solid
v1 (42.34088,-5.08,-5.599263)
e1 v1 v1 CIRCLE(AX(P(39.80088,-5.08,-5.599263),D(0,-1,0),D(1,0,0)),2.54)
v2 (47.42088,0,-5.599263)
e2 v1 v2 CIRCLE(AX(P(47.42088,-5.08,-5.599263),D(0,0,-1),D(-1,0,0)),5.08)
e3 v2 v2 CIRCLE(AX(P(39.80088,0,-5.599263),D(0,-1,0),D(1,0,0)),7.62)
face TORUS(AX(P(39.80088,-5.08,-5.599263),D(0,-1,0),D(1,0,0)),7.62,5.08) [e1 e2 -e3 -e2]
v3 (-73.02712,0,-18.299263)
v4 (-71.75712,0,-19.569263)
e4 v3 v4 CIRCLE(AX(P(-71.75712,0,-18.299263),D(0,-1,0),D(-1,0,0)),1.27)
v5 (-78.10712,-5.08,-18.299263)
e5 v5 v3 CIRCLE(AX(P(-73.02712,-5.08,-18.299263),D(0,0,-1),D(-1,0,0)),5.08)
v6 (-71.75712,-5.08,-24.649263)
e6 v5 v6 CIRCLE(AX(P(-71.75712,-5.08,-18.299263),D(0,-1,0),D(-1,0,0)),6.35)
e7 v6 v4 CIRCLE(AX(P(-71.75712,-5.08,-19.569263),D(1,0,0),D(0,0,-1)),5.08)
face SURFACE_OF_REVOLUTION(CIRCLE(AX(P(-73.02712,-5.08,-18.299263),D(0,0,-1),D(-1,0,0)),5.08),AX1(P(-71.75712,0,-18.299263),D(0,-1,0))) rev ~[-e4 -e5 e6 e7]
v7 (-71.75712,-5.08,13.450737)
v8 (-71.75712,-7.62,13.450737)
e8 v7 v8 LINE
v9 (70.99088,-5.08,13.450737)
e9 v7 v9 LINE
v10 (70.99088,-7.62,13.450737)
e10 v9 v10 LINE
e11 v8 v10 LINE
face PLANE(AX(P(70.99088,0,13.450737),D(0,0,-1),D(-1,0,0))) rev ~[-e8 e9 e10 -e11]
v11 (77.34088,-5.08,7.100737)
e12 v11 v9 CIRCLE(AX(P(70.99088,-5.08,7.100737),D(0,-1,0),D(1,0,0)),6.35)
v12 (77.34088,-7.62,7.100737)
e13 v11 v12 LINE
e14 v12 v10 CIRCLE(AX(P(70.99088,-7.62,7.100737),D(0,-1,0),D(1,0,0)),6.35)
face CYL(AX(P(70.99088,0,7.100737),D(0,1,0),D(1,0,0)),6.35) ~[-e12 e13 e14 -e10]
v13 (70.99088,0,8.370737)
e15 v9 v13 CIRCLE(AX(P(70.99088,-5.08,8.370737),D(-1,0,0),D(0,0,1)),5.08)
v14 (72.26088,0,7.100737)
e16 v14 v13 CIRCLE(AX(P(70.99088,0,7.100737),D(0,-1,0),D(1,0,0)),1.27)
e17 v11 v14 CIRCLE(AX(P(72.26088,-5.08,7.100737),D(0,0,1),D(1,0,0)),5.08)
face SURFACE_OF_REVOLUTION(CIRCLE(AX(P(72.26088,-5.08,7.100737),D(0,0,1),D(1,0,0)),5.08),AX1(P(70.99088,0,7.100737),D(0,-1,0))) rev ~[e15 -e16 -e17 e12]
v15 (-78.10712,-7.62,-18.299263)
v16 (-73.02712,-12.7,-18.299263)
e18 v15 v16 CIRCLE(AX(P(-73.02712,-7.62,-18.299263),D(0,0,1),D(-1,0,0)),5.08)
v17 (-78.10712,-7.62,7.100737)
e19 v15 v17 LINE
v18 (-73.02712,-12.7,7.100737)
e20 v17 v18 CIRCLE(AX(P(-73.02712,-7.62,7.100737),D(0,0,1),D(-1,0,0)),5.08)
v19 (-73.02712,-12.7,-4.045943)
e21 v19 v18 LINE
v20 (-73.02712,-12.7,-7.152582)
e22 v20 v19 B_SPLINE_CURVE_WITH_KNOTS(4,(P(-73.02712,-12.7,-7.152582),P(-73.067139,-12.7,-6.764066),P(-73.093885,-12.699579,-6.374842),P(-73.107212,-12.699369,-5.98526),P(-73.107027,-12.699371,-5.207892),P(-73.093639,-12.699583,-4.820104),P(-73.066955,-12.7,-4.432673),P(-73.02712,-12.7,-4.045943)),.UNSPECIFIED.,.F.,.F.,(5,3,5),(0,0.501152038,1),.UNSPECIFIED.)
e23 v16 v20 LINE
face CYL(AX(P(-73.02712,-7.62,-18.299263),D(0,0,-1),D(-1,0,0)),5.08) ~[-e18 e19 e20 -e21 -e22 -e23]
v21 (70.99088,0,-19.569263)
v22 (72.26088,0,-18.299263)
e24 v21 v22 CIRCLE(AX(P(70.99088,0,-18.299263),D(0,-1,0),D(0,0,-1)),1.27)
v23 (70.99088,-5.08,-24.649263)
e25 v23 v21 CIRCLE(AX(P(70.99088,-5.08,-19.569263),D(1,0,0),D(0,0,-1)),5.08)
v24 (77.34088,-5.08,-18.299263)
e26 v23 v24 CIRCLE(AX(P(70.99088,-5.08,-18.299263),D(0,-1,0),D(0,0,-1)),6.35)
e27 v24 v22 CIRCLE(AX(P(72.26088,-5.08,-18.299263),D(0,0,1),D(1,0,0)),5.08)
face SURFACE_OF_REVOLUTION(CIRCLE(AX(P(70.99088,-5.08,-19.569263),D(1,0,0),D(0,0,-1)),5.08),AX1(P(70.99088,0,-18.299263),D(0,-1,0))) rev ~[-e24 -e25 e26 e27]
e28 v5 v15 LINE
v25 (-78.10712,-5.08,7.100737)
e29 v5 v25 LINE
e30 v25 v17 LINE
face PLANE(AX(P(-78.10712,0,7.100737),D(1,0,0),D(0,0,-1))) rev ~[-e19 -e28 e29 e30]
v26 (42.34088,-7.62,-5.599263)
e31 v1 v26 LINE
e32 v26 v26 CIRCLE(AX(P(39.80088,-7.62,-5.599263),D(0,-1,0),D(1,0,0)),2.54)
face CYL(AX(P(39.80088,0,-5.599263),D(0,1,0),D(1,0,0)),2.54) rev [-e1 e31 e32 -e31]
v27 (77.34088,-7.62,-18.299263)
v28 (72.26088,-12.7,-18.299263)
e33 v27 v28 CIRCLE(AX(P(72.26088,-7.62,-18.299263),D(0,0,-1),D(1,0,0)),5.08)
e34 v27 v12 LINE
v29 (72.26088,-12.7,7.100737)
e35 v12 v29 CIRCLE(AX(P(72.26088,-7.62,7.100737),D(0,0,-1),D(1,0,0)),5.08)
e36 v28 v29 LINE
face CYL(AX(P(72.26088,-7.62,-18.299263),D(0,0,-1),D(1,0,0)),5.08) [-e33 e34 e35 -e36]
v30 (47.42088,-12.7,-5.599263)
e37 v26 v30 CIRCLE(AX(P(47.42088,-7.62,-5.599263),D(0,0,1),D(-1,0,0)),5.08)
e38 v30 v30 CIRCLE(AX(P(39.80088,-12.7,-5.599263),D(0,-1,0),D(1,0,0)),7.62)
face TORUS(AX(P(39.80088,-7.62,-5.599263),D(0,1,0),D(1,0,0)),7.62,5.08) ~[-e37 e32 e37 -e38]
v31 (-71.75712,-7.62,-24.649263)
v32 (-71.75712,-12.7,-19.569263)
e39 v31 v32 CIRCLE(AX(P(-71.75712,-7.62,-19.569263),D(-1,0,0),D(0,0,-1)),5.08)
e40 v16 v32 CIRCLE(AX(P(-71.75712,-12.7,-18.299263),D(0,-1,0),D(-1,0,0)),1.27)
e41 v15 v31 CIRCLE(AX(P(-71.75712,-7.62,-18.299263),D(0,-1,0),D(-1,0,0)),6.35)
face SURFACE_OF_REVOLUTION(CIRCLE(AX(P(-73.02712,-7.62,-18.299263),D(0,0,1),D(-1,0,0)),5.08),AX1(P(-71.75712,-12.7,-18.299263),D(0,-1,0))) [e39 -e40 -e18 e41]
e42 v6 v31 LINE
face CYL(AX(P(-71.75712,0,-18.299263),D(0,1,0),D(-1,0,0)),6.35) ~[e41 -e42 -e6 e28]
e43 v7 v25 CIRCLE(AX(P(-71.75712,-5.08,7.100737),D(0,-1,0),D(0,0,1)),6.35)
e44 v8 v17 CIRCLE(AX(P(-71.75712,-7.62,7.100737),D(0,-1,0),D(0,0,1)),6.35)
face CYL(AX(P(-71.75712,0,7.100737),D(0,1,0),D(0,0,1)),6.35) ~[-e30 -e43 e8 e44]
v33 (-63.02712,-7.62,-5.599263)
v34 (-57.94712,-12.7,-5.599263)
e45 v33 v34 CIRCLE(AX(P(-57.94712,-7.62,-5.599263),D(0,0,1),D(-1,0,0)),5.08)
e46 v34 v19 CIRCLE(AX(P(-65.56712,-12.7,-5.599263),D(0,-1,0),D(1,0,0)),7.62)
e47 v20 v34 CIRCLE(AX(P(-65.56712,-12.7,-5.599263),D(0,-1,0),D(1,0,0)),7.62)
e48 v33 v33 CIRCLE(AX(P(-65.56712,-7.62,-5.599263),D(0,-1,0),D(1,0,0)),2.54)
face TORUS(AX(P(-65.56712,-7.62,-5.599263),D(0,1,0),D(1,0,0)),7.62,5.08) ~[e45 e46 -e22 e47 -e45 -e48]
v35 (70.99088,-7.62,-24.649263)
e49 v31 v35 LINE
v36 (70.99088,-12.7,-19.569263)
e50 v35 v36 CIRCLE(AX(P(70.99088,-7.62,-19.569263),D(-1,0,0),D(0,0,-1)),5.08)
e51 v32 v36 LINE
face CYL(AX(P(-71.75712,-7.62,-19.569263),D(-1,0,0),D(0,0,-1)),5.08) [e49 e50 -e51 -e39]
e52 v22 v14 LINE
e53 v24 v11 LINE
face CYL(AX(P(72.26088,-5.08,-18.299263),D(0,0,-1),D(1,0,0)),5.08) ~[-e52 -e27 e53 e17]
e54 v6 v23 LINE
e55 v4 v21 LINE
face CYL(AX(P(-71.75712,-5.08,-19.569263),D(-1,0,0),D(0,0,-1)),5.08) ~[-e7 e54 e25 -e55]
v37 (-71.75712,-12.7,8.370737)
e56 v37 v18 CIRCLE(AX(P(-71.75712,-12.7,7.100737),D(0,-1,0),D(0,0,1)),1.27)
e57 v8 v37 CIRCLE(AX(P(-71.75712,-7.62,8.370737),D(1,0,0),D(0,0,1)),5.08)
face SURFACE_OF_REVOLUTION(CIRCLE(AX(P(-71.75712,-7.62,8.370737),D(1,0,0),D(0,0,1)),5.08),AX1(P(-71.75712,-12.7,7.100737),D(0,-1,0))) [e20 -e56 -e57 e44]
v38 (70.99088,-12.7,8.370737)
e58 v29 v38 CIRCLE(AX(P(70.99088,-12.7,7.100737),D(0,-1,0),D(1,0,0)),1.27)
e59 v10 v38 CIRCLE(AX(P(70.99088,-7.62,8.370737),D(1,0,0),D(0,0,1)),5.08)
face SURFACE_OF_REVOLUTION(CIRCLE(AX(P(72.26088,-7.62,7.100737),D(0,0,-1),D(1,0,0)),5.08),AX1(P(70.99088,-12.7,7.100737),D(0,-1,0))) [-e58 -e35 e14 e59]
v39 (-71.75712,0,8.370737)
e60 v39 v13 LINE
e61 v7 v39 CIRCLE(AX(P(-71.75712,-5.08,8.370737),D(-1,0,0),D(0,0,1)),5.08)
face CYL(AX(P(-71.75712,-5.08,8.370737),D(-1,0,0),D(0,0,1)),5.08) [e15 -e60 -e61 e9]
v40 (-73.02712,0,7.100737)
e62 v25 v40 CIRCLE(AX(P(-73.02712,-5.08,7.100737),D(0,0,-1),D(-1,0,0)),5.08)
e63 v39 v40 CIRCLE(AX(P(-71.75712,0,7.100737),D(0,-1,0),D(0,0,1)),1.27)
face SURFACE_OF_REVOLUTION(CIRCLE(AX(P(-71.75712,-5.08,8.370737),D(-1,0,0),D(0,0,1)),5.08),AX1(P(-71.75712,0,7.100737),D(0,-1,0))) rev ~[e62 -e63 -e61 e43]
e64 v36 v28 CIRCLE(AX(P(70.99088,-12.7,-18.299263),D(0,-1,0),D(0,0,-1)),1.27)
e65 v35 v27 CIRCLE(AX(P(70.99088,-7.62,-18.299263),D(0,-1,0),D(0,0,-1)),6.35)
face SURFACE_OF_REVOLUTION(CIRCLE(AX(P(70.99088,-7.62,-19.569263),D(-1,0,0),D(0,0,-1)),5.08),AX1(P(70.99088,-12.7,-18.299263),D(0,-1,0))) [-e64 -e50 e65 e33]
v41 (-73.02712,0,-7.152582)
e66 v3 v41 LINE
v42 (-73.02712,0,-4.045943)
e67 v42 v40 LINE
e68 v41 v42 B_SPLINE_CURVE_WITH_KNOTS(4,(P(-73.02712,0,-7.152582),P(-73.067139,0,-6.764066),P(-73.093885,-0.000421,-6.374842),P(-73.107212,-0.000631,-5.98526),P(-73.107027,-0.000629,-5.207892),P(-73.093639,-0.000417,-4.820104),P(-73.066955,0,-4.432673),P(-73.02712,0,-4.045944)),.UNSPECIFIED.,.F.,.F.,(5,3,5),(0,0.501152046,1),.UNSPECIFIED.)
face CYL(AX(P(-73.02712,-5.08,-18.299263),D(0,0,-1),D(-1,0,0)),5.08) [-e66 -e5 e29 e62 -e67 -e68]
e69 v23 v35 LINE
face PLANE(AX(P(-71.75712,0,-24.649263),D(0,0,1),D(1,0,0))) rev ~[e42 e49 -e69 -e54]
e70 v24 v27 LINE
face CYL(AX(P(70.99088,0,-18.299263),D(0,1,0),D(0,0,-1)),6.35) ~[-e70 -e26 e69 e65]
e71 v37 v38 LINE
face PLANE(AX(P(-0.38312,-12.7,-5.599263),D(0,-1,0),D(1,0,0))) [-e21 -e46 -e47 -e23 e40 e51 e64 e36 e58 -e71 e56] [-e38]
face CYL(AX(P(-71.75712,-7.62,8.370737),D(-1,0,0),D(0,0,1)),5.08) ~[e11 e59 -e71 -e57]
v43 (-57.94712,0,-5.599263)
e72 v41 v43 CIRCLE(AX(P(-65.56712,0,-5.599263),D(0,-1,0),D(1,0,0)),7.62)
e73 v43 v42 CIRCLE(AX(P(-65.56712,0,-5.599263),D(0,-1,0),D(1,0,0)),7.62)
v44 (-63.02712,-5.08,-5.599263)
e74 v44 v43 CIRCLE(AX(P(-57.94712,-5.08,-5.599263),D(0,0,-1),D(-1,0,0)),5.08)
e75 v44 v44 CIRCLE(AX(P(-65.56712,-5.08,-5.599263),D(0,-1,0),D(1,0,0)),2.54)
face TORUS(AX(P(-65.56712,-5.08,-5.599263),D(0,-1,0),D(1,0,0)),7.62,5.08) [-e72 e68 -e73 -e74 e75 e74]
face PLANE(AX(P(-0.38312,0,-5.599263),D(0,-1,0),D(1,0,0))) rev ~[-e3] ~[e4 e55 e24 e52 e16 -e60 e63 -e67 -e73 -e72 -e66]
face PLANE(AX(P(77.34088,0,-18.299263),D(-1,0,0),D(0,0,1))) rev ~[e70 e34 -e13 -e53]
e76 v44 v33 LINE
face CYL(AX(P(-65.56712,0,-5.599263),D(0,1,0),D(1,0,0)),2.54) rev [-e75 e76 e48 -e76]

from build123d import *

# Parameters (mm, degrees)
F0_R         = 2.54
F1_DEPTH     = 12.7
F2_T1_DEPTH  = 142.748
F2_T3_DEPTH  = 25.4
F2_T6_ANGLE  = 90
F2_T8_ANGLE  = 90
F2_T10_ANGLE = 90
F2_T12_ANGLE = 90
F2_T18_ANGLE = 90
F2_T20_ANGLE = 90
F2_T22_ANGLE = 90
F2_T24_ANGLE = 90


# Not quite as in the source:
# - a fillet or chamfer that OpenCascade refuses, or shapes differently, is made with other operations: its cross-section is extruded or revolved along the edge and cut away or added


with BuildPart() as f1:
    # F0 (on Front) → F1 (new body)
    with BuildSketch(Plane.XZ):
        with BuildLine():
            Line((70.9908799698, 13.4507374847), (-71.7571200302, 13.4507374847))
            ThreePointArc((-71.7571200302, 13.4507374847), (-76.2472480907, 11.5908655453), (-78.1071200302, 7.1007374847))
            Line((-78.1071200302, 7.1007374847), (-78.1071200302, -18.2992625153))
            ThreePointArc((-78.1071200302, -18.2992625153), (-76.2472480907, -22.7893905758), (-71.7571200302, -24.6492625153))
            Line((-71.7571200302, -24.6492625153), (70.9908799698, -24.6492625153))
            ThreePointArc((70.9908799698, -24.6492625153), (75.4810080304, -22.7893905758), (77.3408799698, -18.2992625153))
            Line((77.3408799698, -18.2992625153), (77.3408799698, 7.1007374847))
            ThreePointArc((77.3408799698, 7.1007374847), (75.4810080304, 11.5908655453), (70.9908799698, 13.4507374847))
        make_face()
        with Locations((-65.5671200302, -5.5992625153)):
            Circle(F0_R, mode=Mode.SUBTRACT)
        with Locations((39.8008799698, -5.5992626585)):
            Circle(F0_R, mode=Mode.SUBTRACT)
    extrude(amount=F1_DEPTH)

    # F2: fillet of radius 5.08 on 20 edges, made by hand

    # F2_s2 → F2_t1 (cut)
    with BuildSketch(Plane.YZ.offset(-71.7571200302)):
        with BuildLine():
            ThreePointArc((-7.62, 13.4507374847), (-11.2121024484, 11.9628399332), (-12.7, 8.3707374847))
            Line((-12.7, 8.3707374847), (-12.7, 13.4507374847))
            Line((-12.7, 13.4507374847), (-7.62, 13.4507374847))
        make_face()
        with BuildLine():
            ThreePointArc((-5.08, 13.4507374847), (-1.4878975516, 11.9628399332), (0, 8.3707374847))
            Line((0, 8.3707374847), (0, 13.4507374847))
            Line((0, 13.4507374847), (-5.08, 13.4507374847))
        make_face()
        with BuildLine():
            ThreePointArc((-7.62, -24.6492625153), (-11.2121024484, -23.1613649637), (-12.7, -19.5692625153))
            Line((-12.7, -19.5692625153), (-12.7, -24.6492625153))
            Line((-12.7, -24.6492625153), (-7.62, -24.6492625153))
        make_face()
        with BuildLine():
            ThreePointArc((-5.08, -24.6492625153), (-1.4878975516, -23.1613649637), (0, -19.5692625153))
            Line((0, -19.5692625153), (0, -24.6492625153))
            Line((0, -24.6492625153), (-5.08, -24.6492625153))
        make_face()
    extrude(amount=F2_T1_DEPTH, mode=Mode.SUBTRACT)

    # F2_s4 → F2_t3 (cut)
    with BuildSketch(Plane.XY.offset(-18.2992625153)):
        with BuildLine():
            ThreePointArc((-78.1071200302, -5.08), (-76.6192224786, -1.4878975516), (-73.0271200302, 0))
            Line((-73.0271200302, 0), (-78.1071200302, 0))
            Line((-78.1071200302, 0), (-78.1071200302, -5.08))
        make_face()
        with BuildLine():
            ThreePointArc((77.3408799698, -5.08), (75.8529824183, -1.4878975516), (72.2608799698, 0))
            Line((72.2608799698, 0), (77.3408799698, 0))
            Line((77.3408799698, 0), (77.3408799698, -5.08))
        make_face()
        with BuildLine():
            ThreePointArc((-78.1071200302, -7.62), (-76.6192224786, -11.2121024484), (-73.0271200302, -12.7))
            Line((-73.0271200302, -12.7), (-78.1071200302, -12.7))
            Line((-78.1071200302, -12.7), (-78.1071200302, -7.62))
        make_face()
        with BuildLine():
            ThreePointArc((77.3408799698, -7.62), (75.8529824183, -11.2121024484), (72.2608799698, -12.7))
            Line((72.2608799698, -12.7), (77.3408799698, -12.7))
            Line((77.3408799698, -12.7), (77.3408799698, -7.62))
        make_face()
    extrude(amount=F2_T3_DEPTH, mode=Mode.SUBTRACT)

    # F2_s5 → F2_t6 (revolve, cut)
    with BuildSketch(Plane.YZ.offset(-71.7571200302)):
        with BuildLine():
            ThreePointArc((-5.08, 13.4507374847), (-1.4878975516, 11.9628399332), (0, 8.3707374847))
            Line((0, 8.3707374847), (0, 13.4507374847))
            Line((0, 13.4507374847), (-5.08, 13.4507374847))
        make_face()
    revolve(axis=Axis((-71.7571200302, 0, 7.1007374847), (0, -1, 0)), revolution_arc=F2_T6_ANGLE, mode=Mode.SUBTRACT)

    # F2_s7 → F2_t8 (revolve, cut)
    with BuildSketch(Plane.XY.offset(-18.2992625153)):
        with BuildLine():
            ThreePointArc((-78.1071200302, -5.08), (-76.6192224786, -1.4878975516), (-73.0271200302, 0))
            Line((-73.0271200302, 0), (-78.1071200302, 0))
            Line((-78.1071200302, 0), (-78.1071200302, -5.08))
        make_face()
    revolve(axis=Axis((-71.7571200302, 0, -18.2992625153), (0, -1, 0)), revolution_arc=F2_T8_ANGLE, mode=Mode.SUBTRACT)

    # F2_s9 → F2_t10 (revolve, cut)
    with BuildSketch(Plane.YZ.offset(70.9908799698)):
        with BuildLine():
            ThreePointArc((-5.08, -24.6492625153), (-1.4878975516, -23.1613649637), (0, -19.5692625153))
            Line((0, -19.5692625153), (0, -24.6492625153))
            Line((0, -24.6492625153), (-5.08, -24.6492625153))
        make_face()
    revolve(axis=Axis((70.9908799698, 0, -18.2992625153), (0, -1, 0)), revolution_arc=F2_T10_ANGLE, mode=Mode.SUBTRACT)

    # F2_s11 → F2_t12 (revolve, cut)
    with BuildSketch(Plane.XY.offset(7.1007374847)):
        with BuildLine():
            ThreePointArc((77.3408799698, -5.08), (75.8529824183, -1.4878975516), (72.2608799698, 0))
            Line((72.2608799698, 0), (77.3408799698, 0))
            Line((77.3408799698, 0), (77.3408799698, -5.08))
        make_face()
    revolve(axis=Axis((70.9908799698, 0, 7.1007374847), (0, -1, 0)), revolution_arc=F2_T12_ANGLE, mode=Mode.SUBTRACT)

    # F2_s13 → F2_t14 (revolve, cut)
    with BuildSketch(Plane.XY.offset(-5.5992625153)):
        with BuildLine():
            ThreePointArc((-63.0271200302, -5.08), (-61.5392224786, -1.4878975516), (-57.9471200302, 0))
            Line((-57.9471200302, 0), (-63.0271200302, 0))
            Line((-63.0271200302, 0), (-63.0271200302, -5.08))
        make_face()
    revolve(axis=Axis((-65.5671200302, 0, -5.5992625153), (0, -1, 0)), mode=Mode.SUBTRACT)

    # F2_s15 → F2_t16 (revolve, cut)
    with BuildSketch(Plane.XY.offset(-5.5992626585)):
        with BuildLine():
            ThreePointArc((42.3408799698, -5.08), (43.8287775214, -1.4878975516), (47.4208799698, 0))
            Line((47.4208799698, 0), (42.3408799698, 0))
            Line((42.3408799698, 0), (42.3408799698, -5.08))
        make_face()
    revolve(axis=Axis((39.8008799698, 0, -5.5992626585), (0, -1, 0)), mode=Mode.SUBTRACT)

    # F2_s17 → F2_t18 (revolve, cut)
    with BuildSketch(Plane.YZ.offset(-71.7571200302)):
        with BuildLine():
            ThreePointArc((-7.62, 13.4507374847), (-11.2121024484, 11.9628399332), (-12.7, 8.3707374847))
            Line((-12.7, 8.3707374847), (-12.7, 13.4507374847))
            Line((-12.7, 13.4507374847), (-7.62, 13.4507374847))
        make_face()
    revolve(axis=Axis((-71.7571200302, -12.7, 7.1007374847), (0, -1, 0)), revolution_arc=F2_T18_ANGLE, mode=Mode.SUBTRACT)

    # F2_s19 → F2_t20 (revolve, cut)
    with BuildSketch(Plane.XY.offset(-18.2992625153)):
        with BuildLine():
            ThreePointArc((-78.1071200302, -7.62), (-76.6192224786, -11.2121024484), (-73.0271200302, -12.7))
            Line((-73.0271200302, -12.7), (-78.1071200302, -12.7))
            Line((-78.1071200302, -12.7), (-78.1071200302, -7.62))
        make_face()
    revolve(axis=Axis((-71.7571200302, -12.7, -18.2992625153), (0, -1, 0)), revolution_arc=F2_T20_ANGLE, mode=Mode.SUBTRACT)

    # F2_s21 → F2_t22 (revolve, cut)
    with BuildSketch(Plane.YZ.offset(70.9908799698)):
        with BuildLine():
            ThreePointArc((-7.62, -24.6492625153), (-11.2121024484, -23.1613649637), (-12.7, -19.5692625153))
            Line((-12.7, -19.5692625153), (-12.7, -24.6492625153))
            Line((-12.7, -24.6492625153), (-7.62, -24.6492625153))
        make_face()
    revolve(axis=Axis((70.9908799698, -12.7, -18.2992625153), (0, -1, 0)), revolution_arc=F2_T22_ANGLE, mode=Mode.SUBTRACT)

    # F2_s23 → F2_t24 (revolve, cut)
    with BuildSketch(Plane.XY.offset(7.1007374847)):
        with BuildLine():
            ThreePointArc((77.3408799698, -7.62), (75.8529824183, -11.2121024484), (72.2608799698, -12.7))
            Line((72.2608799698, -12.7), (77.3408799698, -12.7))
            Line((77.3408799698, -12.7), (77.3408799698, -7.62))
        make_face()
    revolve(axis=Axis((70.9908799698, -12.7, 7.1007374847), (0, -1, 0)), revolution_arc=F2_T24_ANGLE, mode=Mode.SUBTRACT)

    # F2_s25 → F2_t26 (revolve, cut)
    with BuildSketch(Plane.XY.offset(-5.5992625153)):
        with BuildLine():
            ThreePointArc((-63.0271200302, -7.62), (-61.5392224786, -11.2121024484), (-57.9471200302, -12.7))
            Line((-57.9471200302, -12.7), (-63.0271200302, -12.7))
            Line((-63.0271200302, -12.7), (-63.0271200302, -7.62))
        make_face()
    revolve(axis=Axis((-65.5671200302, -12.7, -5.5992625153), (0, -1, 0)), mode=Mode.SUBTRACT)

    # F2_s27 → F2_t28 (revolve, cut)
    with BuildSketch(Plane.XY.offset(-5.5992626585)):
        with BuildLine():
            ThreePointArc((42.3408799698, -7.62), (43.8287775214, -11.2121024484), (47.4208799698, -12.7))
            Line((47.4208799698, -12.7), (42.3408799698, -12.7))
            Line((42.3408799698, -12.7), (42.3408799698, -7.62))
        make_face()
    revolve(axis=Axis((39.8008799698, -12.7, -5.5992626585), (0, -1, 0)), mode=Mode.SUBTRACT)


solid = f1.part
